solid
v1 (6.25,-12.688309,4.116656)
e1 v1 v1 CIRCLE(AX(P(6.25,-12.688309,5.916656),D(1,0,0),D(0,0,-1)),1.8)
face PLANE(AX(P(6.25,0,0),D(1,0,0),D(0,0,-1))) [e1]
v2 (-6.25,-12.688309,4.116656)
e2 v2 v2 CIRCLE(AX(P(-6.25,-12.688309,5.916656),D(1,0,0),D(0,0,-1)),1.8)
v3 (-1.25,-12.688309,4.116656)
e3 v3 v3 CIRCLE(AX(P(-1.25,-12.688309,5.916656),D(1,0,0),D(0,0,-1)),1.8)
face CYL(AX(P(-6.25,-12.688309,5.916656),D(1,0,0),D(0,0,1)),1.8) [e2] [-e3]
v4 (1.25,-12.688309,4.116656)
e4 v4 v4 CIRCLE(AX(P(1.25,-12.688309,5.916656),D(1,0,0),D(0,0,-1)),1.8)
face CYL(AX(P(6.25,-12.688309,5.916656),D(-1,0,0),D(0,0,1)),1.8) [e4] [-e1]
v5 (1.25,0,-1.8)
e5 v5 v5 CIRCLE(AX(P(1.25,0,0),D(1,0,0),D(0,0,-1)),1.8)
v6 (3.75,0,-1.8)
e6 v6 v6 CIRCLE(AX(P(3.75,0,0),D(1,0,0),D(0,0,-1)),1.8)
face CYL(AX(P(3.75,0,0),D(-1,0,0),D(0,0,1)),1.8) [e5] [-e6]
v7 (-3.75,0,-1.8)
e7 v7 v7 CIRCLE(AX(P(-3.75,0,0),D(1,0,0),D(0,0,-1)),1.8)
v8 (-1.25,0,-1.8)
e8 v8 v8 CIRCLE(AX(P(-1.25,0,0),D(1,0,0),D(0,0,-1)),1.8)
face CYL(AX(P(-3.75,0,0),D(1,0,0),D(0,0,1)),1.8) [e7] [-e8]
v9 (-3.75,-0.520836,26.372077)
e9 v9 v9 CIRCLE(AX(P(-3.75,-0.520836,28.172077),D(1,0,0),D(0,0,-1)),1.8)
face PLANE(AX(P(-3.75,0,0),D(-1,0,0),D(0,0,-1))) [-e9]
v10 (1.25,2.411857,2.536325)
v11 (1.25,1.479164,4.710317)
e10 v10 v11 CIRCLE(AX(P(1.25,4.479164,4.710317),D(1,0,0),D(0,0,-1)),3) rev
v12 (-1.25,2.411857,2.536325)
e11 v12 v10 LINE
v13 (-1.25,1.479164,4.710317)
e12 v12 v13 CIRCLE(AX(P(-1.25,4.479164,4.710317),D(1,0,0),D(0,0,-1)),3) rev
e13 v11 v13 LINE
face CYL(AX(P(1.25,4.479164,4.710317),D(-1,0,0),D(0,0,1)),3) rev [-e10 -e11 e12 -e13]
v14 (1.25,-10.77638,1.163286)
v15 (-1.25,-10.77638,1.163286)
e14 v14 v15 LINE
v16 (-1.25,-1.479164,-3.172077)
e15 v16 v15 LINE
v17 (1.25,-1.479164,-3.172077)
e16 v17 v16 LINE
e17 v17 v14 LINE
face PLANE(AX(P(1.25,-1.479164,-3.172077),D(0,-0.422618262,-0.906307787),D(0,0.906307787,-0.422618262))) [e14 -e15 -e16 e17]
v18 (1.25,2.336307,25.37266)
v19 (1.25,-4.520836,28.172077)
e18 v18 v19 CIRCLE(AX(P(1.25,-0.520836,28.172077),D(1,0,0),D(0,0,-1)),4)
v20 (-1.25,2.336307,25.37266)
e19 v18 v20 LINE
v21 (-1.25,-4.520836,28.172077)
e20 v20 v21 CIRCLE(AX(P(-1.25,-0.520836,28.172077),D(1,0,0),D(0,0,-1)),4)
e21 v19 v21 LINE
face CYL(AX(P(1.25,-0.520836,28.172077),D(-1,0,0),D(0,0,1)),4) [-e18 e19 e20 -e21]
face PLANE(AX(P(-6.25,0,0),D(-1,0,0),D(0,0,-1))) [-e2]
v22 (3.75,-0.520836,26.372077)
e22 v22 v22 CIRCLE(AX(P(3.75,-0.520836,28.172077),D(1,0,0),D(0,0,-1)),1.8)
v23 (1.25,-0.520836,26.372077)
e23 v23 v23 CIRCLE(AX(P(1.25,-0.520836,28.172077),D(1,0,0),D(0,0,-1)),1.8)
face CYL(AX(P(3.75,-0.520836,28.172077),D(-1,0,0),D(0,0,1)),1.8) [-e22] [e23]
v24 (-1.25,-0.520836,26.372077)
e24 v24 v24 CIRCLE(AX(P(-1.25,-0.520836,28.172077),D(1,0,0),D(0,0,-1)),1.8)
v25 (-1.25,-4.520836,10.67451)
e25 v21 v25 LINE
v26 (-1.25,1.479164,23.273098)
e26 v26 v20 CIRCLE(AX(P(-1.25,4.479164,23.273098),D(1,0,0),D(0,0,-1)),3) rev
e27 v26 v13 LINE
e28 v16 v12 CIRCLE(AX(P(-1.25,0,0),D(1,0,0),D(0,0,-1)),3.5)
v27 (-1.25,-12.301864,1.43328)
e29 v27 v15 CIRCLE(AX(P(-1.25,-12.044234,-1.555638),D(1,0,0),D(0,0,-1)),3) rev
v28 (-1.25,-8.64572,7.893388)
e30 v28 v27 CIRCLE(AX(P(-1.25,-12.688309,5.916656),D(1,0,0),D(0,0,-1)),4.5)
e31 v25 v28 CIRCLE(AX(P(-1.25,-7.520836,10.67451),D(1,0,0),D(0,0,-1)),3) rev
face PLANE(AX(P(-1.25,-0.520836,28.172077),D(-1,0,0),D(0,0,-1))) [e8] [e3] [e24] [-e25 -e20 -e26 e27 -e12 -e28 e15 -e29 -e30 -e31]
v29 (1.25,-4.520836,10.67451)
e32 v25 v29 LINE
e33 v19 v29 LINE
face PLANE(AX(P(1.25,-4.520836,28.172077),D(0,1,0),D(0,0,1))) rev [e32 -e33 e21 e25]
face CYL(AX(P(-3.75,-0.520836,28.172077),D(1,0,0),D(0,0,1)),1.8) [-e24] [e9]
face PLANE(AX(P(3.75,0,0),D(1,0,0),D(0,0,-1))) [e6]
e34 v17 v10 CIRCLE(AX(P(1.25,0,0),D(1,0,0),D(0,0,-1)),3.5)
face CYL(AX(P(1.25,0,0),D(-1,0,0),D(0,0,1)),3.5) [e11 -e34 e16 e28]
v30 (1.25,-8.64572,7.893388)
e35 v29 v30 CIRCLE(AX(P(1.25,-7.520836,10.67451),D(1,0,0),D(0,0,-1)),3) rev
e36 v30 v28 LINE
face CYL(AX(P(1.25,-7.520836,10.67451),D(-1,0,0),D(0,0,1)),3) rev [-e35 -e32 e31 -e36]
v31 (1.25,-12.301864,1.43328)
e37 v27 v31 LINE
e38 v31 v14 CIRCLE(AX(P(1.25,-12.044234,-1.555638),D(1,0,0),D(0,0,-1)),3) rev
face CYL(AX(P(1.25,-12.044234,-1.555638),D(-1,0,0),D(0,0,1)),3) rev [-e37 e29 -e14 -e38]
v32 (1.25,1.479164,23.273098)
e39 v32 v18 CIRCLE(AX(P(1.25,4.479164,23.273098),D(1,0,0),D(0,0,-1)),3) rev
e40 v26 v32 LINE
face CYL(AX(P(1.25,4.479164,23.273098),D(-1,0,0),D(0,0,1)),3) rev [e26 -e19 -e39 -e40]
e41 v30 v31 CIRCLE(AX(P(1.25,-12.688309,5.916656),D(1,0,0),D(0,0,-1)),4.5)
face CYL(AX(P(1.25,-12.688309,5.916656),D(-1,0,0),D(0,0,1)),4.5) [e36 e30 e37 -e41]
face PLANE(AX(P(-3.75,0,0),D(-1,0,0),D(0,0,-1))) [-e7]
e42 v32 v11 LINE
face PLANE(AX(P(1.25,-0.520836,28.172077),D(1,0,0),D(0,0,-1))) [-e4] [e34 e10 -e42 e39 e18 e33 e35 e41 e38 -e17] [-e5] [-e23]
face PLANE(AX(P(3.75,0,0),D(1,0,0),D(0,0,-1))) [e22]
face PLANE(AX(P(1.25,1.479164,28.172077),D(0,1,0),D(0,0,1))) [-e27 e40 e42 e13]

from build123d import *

# Parameters (mm, degrees)
EXTRUDE_1_DEPTH     = 1.25
SKETCH_1_3_R        = 2
CUT_EXTRUDE_1_DEPTH = 37.497164572
FILLET_1_R          = 3
EXTRUDE_START       = -1.25
SKETCH_2_R          = 2
EXTRUDE_2_DEPTH     = 1.25
SKETCH_2_5_R        = 1.8
EXTRUDE_5_DEPTH     = 2.5
SKETCH_2_7_R        = 1.8
EXTRUDE_7_DEPTH     = 5


with BuildPart() as part:
    # 草图1 → 凸台-拉伸1 (new body)
    with BuildSketch(Plane(origin=(0, 0, 0), x_dir=(0, 0, -1), z_dir=(1, 0, 0))):
        with BuildLine():
            Line((-28.172077255, -4.520836084), (-28.172077255, 1.479163916))
            Line((-28.172077255, 1.479163916), (-24.707975639, 1.479163916))
            ThreePointArc((-24.707975639, 1.479163916), (-31.63617887, 1.479163916), (-28.172077255, -4.520836084))
        make_face()
        with BuildLine():
            Line((-24.707975639, 1.479163916), (-28.172077255, 1.479163916))
            Line((-28.172077255, 1.479163916), (-28.172077255, -4.520836084))
            ThreePointArc((-28.172077255, -4.520836084), (-25.34365013, -3.349263209), (-24.172077255, -0.520836084))
            ThreePointArc((-24.172077255, -0.520836084), (-24.308373949, 0.514440097), (-24.707975639, 1.479163916))
        make_face()
        with BuildLine():
            Line((-3.172077255, 1.479163916), (-24.707975639, 1.479163916))
            ThreePointArc((-24.707975639, 1.479163916), (-24.308373949, 0.514440097), (-24.172077255, -0.520836084))
            ThreePointArc((-24.172077255, -0.520836084), (-25.34365013, -3.349263209), (-28.172077255, -4.520836084))
            Line((-28.172077255, -4.520836084), (-5.969923204, -4.520836084))
            Line((-5.969923204, -4.520836084), (-3.172077255, 1.479163916))
        make_face()
        with BuildLine():
            Line((3.172077255, -1.479163916), (-3.172077255, 1.479163916))
            Line((-3.172077255, 1.479163916), (-3.172077255, -1.479163916))
            ThreePointArc((-3.172077255, -1.479163916), (0, -3.5), (3.172077255, -1.479163916))
        make_face()
        with BuildLine():
            ThreePointArc((3.5, 0), (0.757538649, 3.417036025), (-3.172077255, 1.479163916))
            Line((-3.172077255, 1.479163916), (3.172077255, -1.479163916))
            ThreePointArc((3.172077255, -1.479163916), (3.417036025, -0.757538649), (3.5, 0))
        make_face()
        with BuildLine():
            ThreePointArc((-3.172077255, -1.479163916), (-3.5, 0), (-3.172077255, 1.479163916))
            Line((-3.172077255, 1.479163916), (-5.969923204, -4.520836084))
            Line((-5.969923204, -4.520836084), (-3.172077255, -4.520836084))
            Line((-3.172077255, -4.520836084), (-3.172077255, -1.479163916))
        make_face()
        with BuildLine():
            Line((-3.172077255, -1.479163916), (-3.172077255, 1.479163916))
            ThreePointArc((-3.172077255, 1.479163916), (-3.5, 0), (-3.172077255, -1.479163916))
        make_face()
        with BuildLine():
            Line((-3.172077255, -4.520836084), (-5.969923204, -4.520836084))
            Line((-5.969923204, -4.520836084), (-7.893387964, -8.645719574))
            ThreePointArc((-7.893387964, -8.645719574), (-4.014873487, -8.609923977), (-1.549233455, -11.604047406))
            Line((-1.549233455, -11.604047406), (3.172077255, -1.479163916))
            ThreePointArc((3.172077255, -1.479163916), (0, -3.5), (-3.172077255, -1.479163916))
            Line((-3.172077255, -1.479163916), (-3.172077255, -4.520836084))
        make_face()
        with BuildLine():
            ThreePointArc((-1.549233455, -11.604047406), (-4.014873487, -8.609923977), (-7.893387964, -8.645719574))
            Line((-7.893387964, -8.645719574), (-9.088732919, -11.209145102))
            Line((-9.088732919, -11.209145102), (-2.74457841, -14.167472935))
            Line((-2.74457841, -14.167472935), (-1.549233455, -11.604047406))
        make_face()
        with BuildLine():
            Line((-9.088732919, -11.209145102), (-7.893387964, -8.645719574))
            ThreePointArc((-7.893387964, -8.645719574), (-8.299375187, -16.50572276), (-1.416655664, -12.688309019))
            ThreePointArc((-1.416655664, -12.688309019), (-1.449923081, -12.14214052), (-1.549233455, -11.604047406))
            Line((-1.549233455, -11.604047406), (-2.74457841, -14.167472935))
            Line((-2.74457841, -14.167472935), (-9.088732919, -11.209145102))
        make_face()
    extrude(amount=EXTRUDE_1_DEPTH)

    # 草图1<3> → 切除-拉伸1 (cut, through all)
    with BuildSketch(Plane(origin=(0, 0, 0), x_dir=(0, 0, -1), z_dir=(1, 0, 0))):
        with Locations((-28.172077255, -0.520836084)):
            Circle(SKETCH_1_3_R)
        Circle(SKETCH_1_3_R)
        with Locations((-5.916655664, -12.688309019)):
            Circle(SKETCH_1_3_R)
    extrude(amount=CUT_EXTRUDE_1_DEPTH, mode=Mode.SUBTRACT)

    # 圆角1
    # the kernel refuses this fillet: 3 mm, written as the material it adds along each edge
    with BuildSketch(Plane(origin=(0, -11.604047406, 1.549233455), x_dir=(0, 0.9063077870366663, -0.4226182617406644), z_dir=(1, 0, 0))) as fillet_1_piece_1:
        with BuildLine():
            CenterArc((0.913230262, -3), FILLET_1_R, 90, 29.926434867)
            Line((-0.583432693, -0.4), (-0.613365952, -0.348))
            ThreePointArc((-0.613365952, -0.348), (-0.317772106, -0.161995545), (-0.037712362, 0.046666667))
            Line((-0.037712362, 0.046666667), (0, 0.06))
            Line((0, 0.06), (0.913230262, 0.06))
            Line((0.913230262, 0.06), (0.913230262, 0))
        make_face()
    extrude(amount=1.25)
    with BuildSketch(Plane(origin=(0, 1.479163916, 3.172077255), x_dir=(0, 0, 1), z_dir=(1, 0, 0))) as fillet_1_piece_2:
        with BuildLine():
            CenterArc((1.538240209, -3), FILLET_1_R, 90, 46.440922497)
            Line((-0.635752466, -0.932693577), (-0.67923232, -0.891347449))
            ThreePointArc((-0.67923232, -0.891347449), (-0.329607023, -0.458350724), (-0.054378467, 0.025357096))
            Line((-0.054378467, 0.025357096), (0, 0.06))
            Line((0, 0.06), (1.538240209, 0.06))
            Line((1.538240209, 0.06), (1.538240209, 0))
        make_face()
    extrude(amount=1.25)
    with BuildSketch(Plane(origin=(0, 1.479163916, 24.707975639), x_dir=(0, 0.7902368852402469, 0.6128014892326821), z_dir=(1, 0, 0))) as fillet_1_piece_3:
        with BuildLine():
            CenterArc((1.49141536, -2.972297887), FILLET_1_R, 97.792345701, 44.415308597)
            Line((-0.879295296, -1.133893419), (-0.926709509, -1.09712533))
            Line((-0.926709509, -1.09712533), (-0.047414213, 0.036768089))
            Line((-0.047414213, 0.036768089), (0.008134993, 0.059445958))
            ThreePointArc((0.008134993, 0.059445958), (0.542332858, 0.023063849), (1.076530723, 0.059445958))
            Line((1.076530723, 0.059445958), (1.084665716, 0))
        make_face()
    extrude(amount=1.25)
    with BuildSketch(Plane(origin=(0, -4.520836084, 5.969923204), x_dir=(0, 0, 1), z_dir=(1, 0, 0))) as fillet_1_piece_4:
        with BuildLine():
            CenterArc((4.704586321, 3), FILLET_1_R, 157.978087479, 112.021912521)
            Line((1.923464761, 4.12488349), (1.867842329, 4.14738116))
            ThreePointArc((1.867842329, 4.14738116), (0.907353913, 2.087798841), (-0.054378467, 0.025357096))
            Line((-0.054378467, 0.025357096), (0, -0.06))
            Line((0, -0.06), (4.704586321, -0.06))
            Line((4.704586321, -0.06), (4.704586321, 0))
        make_face()
    extrude(amount=1.25)

    # 草图2 → 凸台-拉伸2 (add)
    with BuildSketch(Plane(origin=(1.25, 0, 0), x_dir=(0, 0, -1), z_dir=(1, 0, 0)).offset(EXTRUDE_START)):
        Circle(SKETCH_2_R)
        with Locations((-5.916655664, -12.688309019)):
            Circle(SKETCH_2_R)
        with Locations((-28.172077255, -0.520836084)):
            Circle(SKETCH_2_R)
    extrude(amount=EXTRUDE_2_DEPTH)

    # 草图2<5> → 凸台-拉伸5 (add)
    with BuildSketch(Plane(origin=(1.25, 0, 0), x_dir=(0, 0, -1), z_dir=(1, 0, 0))):
        with Locations((-28.172077255, -0.520836084)):
            Circle(SKETCH_2_5_R)
        Circle(SKETCH_2_5_R)
    extrude(amount=EXTRUDE_5_DEPTH)

    # 草图2<7> → 凸台-拉伸7 (add)
    with BuildSketch(Plane(origin=(1.25, 0, 0), x_dir=(0, 0, -1), z_dir=(1, 0, 0))):
        with Locations((-5.916655664, -12.688309019)):
            Circle(SKETCH_2_7_R)
    extrude(amount=EXTRUDE_7_DEPTH)

    # 镜向1: part across plane


with BuildPart() as part_1:
    add(part.part)
    add(part.part.mirror(Plane.ZY))


solid = part_1.part
